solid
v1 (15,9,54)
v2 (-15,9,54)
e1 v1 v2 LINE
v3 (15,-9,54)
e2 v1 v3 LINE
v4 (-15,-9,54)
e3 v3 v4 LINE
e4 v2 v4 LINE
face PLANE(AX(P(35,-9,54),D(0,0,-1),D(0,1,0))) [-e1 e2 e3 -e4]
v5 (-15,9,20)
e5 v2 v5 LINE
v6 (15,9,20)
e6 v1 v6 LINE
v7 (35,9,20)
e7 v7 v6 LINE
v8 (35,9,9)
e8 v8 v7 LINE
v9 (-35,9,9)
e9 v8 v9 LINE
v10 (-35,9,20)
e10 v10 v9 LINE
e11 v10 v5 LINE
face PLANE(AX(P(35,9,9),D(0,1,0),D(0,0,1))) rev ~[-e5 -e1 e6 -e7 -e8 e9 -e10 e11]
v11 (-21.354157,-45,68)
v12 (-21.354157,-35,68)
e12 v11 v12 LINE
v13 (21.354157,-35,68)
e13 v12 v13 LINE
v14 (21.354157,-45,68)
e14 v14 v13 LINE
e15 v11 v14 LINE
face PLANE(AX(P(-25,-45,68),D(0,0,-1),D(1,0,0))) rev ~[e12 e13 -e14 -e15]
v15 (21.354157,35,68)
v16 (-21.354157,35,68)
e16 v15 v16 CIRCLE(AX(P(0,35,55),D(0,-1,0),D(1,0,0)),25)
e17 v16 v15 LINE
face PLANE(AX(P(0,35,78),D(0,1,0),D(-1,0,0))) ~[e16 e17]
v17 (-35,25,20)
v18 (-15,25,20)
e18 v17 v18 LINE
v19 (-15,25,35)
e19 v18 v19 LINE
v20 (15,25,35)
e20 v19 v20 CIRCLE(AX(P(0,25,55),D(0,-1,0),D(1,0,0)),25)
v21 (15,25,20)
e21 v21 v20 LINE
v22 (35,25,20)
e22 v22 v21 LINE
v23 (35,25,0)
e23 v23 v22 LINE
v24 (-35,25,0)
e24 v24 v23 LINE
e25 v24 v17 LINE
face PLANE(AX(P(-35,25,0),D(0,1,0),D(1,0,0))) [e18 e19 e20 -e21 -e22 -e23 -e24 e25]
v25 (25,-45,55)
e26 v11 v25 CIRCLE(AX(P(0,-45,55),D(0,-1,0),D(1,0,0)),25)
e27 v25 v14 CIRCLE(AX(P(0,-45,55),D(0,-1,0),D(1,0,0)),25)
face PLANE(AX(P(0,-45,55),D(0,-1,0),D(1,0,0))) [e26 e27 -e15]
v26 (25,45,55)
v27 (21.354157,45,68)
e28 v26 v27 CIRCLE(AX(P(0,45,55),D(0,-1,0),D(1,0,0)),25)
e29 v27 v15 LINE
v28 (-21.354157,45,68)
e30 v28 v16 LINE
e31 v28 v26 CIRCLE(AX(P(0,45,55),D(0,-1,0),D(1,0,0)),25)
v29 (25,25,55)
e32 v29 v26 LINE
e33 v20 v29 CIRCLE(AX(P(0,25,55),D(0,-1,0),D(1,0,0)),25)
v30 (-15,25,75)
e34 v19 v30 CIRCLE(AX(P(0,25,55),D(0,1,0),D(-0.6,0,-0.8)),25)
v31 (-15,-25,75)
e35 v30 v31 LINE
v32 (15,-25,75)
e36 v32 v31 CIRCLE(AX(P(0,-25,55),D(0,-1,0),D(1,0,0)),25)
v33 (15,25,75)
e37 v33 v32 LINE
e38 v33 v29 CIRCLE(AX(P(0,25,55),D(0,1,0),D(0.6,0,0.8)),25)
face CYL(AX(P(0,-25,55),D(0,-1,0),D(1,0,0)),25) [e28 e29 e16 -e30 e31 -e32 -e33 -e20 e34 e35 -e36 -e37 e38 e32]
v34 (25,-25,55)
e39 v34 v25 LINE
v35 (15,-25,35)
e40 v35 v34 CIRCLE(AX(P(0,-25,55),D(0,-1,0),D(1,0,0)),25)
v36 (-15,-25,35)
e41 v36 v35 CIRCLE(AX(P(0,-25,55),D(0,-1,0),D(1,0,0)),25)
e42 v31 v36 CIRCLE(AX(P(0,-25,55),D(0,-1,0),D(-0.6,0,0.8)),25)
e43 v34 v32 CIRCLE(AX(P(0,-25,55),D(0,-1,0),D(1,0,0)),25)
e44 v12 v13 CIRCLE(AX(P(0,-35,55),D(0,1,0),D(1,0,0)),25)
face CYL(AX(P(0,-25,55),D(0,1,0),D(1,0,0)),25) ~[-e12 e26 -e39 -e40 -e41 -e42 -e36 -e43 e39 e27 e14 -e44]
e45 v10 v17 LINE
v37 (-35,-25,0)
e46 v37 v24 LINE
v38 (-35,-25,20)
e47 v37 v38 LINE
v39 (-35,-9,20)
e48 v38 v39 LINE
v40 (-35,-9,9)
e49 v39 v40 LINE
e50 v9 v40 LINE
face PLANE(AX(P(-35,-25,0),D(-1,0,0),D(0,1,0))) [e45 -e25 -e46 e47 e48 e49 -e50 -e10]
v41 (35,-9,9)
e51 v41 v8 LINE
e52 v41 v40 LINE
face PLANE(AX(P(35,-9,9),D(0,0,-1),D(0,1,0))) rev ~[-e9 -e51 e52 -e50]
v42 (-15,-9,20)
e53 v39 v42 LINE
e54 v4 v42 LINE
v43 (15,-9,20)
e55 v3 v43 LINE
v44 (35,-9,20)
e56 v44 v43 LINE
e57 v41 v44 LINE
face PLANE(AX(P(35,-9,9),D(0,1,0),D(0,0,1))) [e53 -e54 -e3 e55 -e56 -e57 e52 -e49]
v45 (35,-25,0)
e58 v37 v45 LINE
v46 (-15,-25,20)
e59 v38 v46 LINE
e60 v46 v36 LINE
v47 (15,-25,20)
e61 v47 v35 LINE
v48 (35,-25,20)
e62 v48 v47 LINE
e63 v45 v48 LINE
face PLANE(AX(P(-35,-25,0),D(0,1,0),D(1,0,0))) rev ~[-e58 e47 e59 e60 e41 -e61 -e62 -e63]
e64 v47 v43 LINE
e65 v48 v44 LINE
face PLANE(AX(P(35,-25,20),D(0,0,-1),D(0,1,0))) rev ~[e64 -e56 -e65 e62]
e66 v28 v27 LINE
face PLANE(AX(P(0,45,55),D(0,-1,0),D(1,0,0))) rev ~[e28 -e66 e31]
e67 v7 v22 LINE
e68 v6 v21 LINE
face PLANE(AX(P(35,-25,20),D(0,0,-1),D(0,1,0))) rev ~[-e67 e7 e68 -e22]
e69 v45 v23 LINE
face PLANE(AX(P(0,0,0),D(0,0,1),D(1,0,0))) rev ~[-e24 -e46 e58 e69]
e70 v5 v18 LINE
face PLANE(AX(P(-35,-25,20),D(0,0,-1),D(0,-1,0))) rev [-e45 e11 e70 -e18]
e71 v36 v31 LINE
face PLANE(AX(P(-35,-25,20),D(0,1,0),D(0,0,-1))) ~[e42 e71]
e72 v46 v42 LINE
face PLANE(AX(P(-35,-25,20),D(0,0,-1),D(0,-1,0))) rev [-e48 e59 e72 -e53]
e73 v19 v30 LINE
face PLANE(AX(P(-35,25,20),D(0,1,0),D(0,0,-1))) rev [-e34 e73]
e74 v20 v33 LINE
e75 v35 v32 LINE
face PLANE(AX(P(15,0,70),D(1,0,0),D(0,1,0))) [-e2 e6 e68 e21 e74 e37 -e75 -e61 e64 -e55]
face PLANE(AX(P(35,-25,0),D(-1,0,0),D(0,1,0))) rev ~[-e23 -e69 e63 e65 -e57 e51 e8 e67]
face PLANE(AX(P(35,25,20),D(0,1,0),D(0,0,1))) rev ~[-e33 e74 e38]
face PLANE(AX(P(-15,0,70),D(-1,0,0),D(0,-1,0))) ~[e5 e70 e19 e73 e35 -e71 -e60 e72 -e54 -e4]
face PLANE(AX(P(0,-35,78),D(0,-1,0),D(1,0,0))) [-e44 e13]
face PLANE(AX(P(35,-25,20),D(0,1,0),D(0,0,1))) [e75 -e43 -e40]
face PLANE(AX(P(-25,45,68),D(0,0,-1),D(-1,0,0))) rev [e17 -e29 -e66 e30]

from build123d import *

# Parameters (mm, degrees)
F0_W          = 70
F0_H          = 50
F1_DEPTH      = 70
F2_R          = 25
F3_DEPTH      = 20
F3_DEPTH_BACK = 70
F4_W          = 18
F4_H          = 45
F5_DEPTH      = 70.001
F6_W          = 50
F6_H          = 20
F7_DEPTH      = 10
F8_W          = 50
F8_H          = 100
F9_DEPTH      = 20


# Not quite as in the source:
# - a pattern or mirror of a feature is missing from the dataset's text; its kind, count and spacing are read off the source's solid


with BuildPart() as f1:
    # F0 (on Top) → F1 (new body)
    with BuildSketch(Plane.XY):
        Rectangle(F0_W, F0_H)
    extrude(amount=F1_DEPTH)

    # F2 (on face) → F3 (join, two sides)
    with BuildSketch(Plane.XZ.offset(25)) as f3_sk:
        with Locations((0, 55)):
            Circle(F2_R)
    extrude(amount=F3_DEPTH)
    extrude(f3_sk.sketch, amount=-F3_DEPTH_BACK)

    # F4 (on face) → F5 (cut, through all)
    with BuildSketch(Plane.YZ.offset(35)):
        with Locations((0, 31.5)):
            Rectangle(F4_W, F4_H)
    extrude(amount=-F5_DEPTH, mode=Mode.SUBTRACT)

    # F6 (on face) → F7 (cut)
    with BuildSketch(Plane.XZ.offset(45)):
        with Locations((0, 78)):
            Rectangle(F6_W, F6_H)
    f7 = extrude(amount=-F7_DEPTH, mode=Mode.SUBTRACT)

    # F7_copies: F7 across plane
    add(f7.mirror(Plane.ZX), mode=Mode.SUBTRACT)

    # F8 (on face) → F9 (cut)
    with BuildSketch(Plane.YZ.offset(35)):
        with Locations((0, 70)):
            Rectangle(F8_W, F8_H)
    f9 = extrude(amount=-F9_DEPTH, mode=Mode.SUBTRACT)

    # F9_copies: F9 across plane
    add(f9.mirror(Plane(origin=(0, 0, 0), x_dir=(0, 0, -1), z_dir=(-1, 0, 0))), mode=Mode.SUBTRACT)


solid = f1.part
